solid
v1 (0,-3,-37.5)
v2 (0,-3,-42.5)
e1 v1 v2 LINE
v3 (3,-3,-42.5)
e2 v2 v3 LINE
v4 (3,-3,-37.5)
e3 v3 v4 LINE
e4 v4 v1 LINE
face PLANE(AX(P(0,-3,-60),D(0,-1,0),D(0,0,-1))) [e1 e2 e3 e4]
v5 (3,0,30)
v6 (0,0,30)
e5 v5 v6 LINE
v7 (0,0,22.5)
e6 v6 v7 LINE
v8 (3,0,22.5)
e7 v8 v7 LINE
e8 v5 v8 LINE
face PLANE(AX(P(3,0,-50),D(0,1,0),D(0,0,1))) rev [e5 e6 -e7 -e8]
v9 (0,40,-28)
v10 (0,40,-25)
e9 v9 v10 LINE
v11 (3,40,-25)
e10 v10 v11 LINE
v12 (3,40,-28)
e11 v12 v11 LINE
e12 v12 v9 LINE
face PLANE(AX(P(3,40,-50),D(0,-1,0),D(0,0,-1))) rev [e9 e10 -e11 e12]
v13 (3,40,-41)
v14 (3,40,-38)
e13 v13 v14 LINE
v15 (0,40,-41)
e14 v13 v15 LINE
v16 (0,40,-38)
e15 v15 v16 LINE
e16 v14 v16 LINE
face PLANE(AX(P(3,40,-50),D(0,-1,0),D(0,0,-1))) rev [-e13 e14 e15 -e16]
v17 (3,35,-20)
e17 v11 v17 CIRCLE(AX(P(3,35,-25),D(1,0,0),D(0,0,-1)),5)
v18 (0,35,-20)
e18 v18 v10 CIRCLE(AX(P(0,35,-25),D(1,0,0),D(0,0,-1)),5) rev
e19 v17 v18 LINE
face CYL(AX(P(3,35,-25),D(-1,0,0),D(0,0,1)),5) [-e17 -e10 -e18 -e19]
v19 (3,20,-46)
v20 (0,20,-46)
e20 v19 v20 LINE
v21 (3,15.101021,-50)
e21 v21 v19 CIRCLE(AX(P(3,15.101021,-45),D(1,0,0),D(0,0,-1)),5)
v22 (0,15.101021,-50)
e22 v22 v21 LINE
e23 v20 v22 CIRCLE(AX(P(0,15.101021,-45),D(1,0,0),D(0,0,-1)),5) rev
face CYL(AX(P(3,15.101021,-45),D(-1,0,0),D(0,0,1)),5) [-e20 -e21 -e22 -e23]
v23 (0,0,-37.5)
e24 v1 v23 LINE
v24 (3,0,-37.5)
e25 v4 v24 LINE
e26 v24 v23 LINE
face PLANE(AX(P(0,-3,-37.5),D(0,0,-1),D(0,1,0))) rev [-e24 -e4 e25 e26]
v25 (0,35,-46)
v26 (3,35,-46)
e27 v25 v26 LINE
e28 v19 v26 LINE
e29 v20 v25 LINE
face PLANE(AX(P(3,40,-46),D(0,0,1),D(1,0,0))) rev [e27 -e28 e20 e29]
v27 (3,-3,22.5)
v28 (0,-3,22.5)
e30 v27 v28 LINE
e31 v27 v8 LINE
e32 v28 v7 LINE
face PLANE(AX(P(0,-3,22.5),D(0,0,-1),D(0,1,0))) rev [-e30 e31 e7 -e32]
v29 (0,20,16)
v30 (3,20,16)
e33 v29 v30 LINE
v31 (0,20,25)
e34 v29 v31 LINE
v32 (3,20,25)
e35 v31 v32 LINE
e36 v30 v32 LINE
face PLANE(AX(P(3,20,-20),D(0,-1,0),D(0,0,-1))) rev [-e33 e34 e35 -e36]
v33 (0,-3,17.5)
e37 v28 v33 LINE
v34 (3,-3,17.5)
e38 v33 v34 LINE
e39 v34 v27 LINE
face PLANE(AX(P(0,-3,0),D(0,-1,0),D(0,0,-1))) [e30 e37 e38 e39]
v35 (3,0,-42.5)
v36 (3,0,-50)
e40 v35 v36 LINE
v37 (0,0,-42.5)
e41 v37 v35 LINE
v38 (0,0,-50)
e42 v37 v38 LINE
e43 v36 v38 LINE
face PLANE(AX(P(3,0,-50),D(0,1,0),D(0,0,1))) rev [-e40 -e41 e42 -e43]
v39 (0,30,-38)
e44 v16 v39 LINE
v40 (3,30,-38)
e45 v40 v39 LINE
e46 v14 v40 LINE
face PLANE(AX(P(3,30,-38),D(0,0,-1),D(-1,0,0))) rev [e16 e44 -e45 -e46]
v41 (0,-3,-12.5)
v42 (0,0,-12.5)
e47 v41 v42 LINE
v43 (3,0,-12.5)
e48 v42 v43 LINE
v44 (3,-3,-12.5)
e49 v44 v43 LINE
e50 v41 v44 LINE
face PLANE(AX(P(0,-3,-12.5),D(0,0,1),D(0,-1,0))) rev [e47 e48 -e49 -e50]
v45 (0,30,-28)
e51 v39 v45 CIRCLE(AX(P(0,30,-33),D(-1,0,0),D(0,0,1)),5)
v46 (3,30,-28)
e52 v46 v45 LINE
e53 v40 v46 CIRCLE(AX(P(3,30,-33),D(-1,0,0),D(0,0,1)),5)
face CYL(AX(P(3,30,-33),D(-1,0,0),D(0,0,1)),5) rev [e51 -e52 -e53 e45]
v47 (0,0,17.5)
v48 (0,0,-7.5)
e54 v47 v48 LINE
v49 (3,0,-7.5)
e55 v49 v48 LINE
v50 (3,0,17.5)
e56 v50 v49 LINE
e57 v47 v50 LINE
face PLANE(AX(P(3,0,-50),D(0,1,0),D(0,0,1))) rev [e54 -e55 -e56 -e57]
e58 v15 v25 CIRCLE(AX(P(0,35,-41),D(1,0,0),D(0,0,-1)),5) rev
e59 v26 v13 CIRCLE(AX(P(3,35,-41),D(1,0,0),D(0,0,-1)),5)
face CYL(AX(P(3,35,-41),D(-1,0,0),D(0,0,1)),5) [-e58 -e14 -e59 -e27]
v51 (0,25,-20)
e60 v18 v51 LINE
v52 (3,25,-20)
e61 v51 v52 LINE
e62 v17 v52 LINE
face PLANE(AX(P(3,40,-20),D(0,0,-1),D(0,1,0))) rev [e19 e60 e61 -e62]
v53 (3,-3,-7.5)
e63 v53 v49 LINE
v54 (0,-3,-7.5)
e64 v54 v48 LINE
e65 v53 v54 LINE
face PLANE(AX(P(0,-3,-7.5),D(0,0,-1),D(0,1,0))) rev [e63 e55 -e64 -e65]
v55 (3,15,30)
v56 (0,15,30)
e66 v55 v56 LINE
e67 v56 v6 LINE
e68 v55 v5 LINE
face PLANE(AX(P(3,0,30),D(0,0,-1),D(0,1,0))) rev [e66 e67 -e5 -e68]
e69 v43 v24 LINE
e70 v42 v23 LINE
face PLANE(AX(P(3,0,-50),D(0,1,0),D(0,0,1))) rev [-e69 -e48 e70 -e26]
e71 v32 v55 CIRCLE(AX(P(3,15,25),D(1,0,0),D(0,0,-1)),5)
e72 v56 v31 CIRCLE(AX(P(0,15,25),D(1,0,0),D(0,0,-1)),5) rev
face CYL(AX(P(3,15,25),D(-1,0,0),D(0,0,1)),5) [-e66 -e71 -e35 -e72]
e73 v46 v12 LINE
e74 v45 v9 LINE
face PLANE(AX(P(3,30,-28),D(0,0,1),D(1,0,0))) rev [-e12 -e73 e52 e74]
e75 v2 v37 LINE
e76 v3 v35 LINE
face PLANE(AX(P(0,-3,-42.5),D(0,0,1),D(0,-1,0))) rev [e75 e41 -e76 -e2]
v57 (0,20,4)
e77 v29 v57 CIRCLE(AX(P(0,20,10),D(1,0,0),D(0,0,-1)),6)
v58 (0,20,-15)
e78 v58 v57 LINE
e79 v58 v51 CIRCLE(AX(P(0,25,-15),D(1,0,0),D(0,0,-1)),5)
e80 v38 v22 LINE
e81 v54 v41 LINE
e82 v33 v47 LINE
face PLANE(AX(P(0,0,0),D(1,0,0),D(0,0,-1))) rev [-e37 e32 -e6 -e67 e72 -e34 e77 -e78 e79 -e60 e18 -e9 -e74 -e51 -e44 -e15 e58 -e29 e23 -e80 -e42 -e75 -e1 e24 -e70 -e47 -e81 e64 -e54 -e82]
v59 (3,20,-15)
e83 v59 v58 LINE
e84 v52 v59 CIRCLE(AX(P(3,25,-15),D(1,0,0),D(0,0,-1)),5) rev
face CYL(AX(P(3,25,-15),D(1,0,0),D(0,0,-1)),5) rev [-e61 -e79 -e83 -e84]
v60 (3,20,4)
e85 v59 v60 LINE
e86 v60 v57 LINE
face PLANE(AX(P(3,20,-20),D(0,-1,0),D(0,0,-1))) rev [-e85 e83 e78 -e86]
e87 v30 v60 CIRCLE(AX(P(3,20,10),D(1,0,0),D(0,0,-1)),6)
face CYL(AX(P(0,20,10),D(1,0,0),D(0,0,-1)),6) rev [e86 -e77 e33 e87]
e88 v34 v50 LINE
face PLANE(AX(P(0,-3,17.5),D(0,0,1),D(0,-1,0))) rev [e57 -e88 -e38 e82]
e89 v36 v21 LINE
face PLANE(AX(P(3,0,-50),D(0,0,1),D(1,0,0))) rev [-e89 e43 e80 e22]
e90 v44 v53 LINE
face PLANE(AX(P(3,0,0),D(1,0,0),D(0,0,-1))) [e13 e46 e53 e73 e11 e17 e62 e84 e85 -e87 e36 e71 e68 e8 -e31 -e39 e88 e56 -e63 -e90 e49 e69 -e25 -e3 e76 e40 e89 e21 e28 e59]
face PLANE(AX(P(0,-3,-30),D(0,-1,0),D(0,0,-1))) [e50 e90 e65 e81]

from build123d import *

# Parameters (mm, degrees)
SKETCH1_W           = 80
SKETCH1_H           = 40
BOSS_EXTRUDE1_DEPTH = 3
SKETCH2_R           = 6
CUT_EXTRUDE1_DEPTH  = 65.101482042
SKETCH5_W           = 4
SKETCH5_H           = 20
SKETCH5_W_2         = 51.247459446
CUT_EXTRUDE2_DEPTH  = 65.101482042
FILLET1_R           = 5
SKETCH6_W           = 3
SKETCH6_H           = 5
BOSS_EXTRUDE2_DEPTH = 3
LPATTERN1_COUNT     = 3
LPATTERN1_PITCH     = 30


with BuildPart() as part:
    # Sketch1 → Boss-Extrude1 (new body)
    with BuildSketch(Plane(origin=(0, 0, 0), x_dir=(0, 0, -1), z_dir=(1, 0, 0))):
        with Locations((10, 20)):
            Rectangle(SKETCH1_W, SKETCH1_H)
    extrude(amount=BOSS_EXTRUDE1_DEPTH)

    # Sketch2 → Cut-Extrude1 (cut, through all)
    with BuildSketch(Plane(origin=(3, 0, 0), x_dir=(0, 0, -1), z_dir=(1, 0, 0))):
        with Locations((-10, 20)):
            Circle(SKETCH2_R)
    extrude(amount=-CUT_EXTRUDE1_DEPTH, mode=Mode.SUBTRACT)

    # Sketch5 → Cut-Extrude2 (cut, through all)
    with BuildSketch(Plane.ZY):
        with BuildLine():
            Line((-28, 30), (-28, 40))
            Line((-28, 40), (-38, 40))
            Line((-38, 40), (-38, 30))
            ThreePointArc((-38, 30), (-33, 25), (-28, 30))
        make_face()
        with Locations((-48, 30)):
            Rectangle(SKETCH5_W, SKETCH5_H)
        with Locations((5.623729723, 30)):
            Rectangle(SKETCH5_W_2, SKETCH5_H)
    extrude(amount=-CUT_EXTRUDE2_DEPTH, mode=Mode.SUBTRACT)

    # Fillet1
    # the kernel refuses this fillet: 5 mm, written as the material it adds along each edge
    with BuildSketch(Plane(origin=(0, 20, -20), x_dir=(0, 1, 0), z_dir=(1, 0, 0))) as fillet1_piece_1:
        with BuildLine():
            CenterArc((FILLET1_R, FILLET1_R), FILLET1_R, 180, 90)
            Line((0, FILLET1_R), (0, 0))
            Line((0, 0), (FILLET1_R, 0))
        make_face()
    extrude(amount=3)
    # the kernel refuses this fillet: 5 mm, written as the material it takes off along each edge
    with BuildSketch(Plane(origin=(-12.5, 40, -46), x_dir=(0, -1, 0), z_dir=(1, 0, 0)), Plane(origin=(-12.5, 40, -20), x_dir=(0, 0, -1), z_dir=(1, 0, 0)), Plane(origin=(15.5, 20, 30), x_dir=(0, -1, 0), z_dir=(-1, 0, 0))) as fillet1_2_piece_1:
        with BuildLine():
            CenterArc((FILLET1_R, -FILLET1_R), FILLET1_R, 90, 90)
            Line((0, -FILLET1_R), (0, 0))
            Line((0, 0), (FILLET1_R, 0))
        make_face()
    extrude(amount=28, mode=Mode.SUBTRACT)
    with BuildSketch(Plane(origin=(-12.247448714, 20, -50), x_dir=(0, -1, 0), z_dir=(1, 0, 0))) as fillet1_2_piece_2:
        with BuildLine():
            CenterArc((4.898979486, -5), FILLET1_R, 90, 78.463040967)
            Line((0, -4), (0, 0))
            Line((0, 0), (4.898979486, 0))
        make_face()
    extrude(amount=27.494897428, mode=Mode.SUBTRACT)

    # Sketch6 → Boss-Extrude2 (add)
    with BuildSketch(Plane.XZ):
        with Locations((1.5, 20)):
            Rectangle(SKETCH6_W, SKETCH6_H)
    boss_extrude2 = extrude(amount=BOSS_EXTRUDE2_DEPTH)

    # LPattern1: Boss-Extrude2 ×3
    with Locations(*[(0, 0, -i * LPATTERN1_PITCH) for i in range(1, LPATTERN1_COUNT)]):
        add(boss_extrude2)


solid = part.part
